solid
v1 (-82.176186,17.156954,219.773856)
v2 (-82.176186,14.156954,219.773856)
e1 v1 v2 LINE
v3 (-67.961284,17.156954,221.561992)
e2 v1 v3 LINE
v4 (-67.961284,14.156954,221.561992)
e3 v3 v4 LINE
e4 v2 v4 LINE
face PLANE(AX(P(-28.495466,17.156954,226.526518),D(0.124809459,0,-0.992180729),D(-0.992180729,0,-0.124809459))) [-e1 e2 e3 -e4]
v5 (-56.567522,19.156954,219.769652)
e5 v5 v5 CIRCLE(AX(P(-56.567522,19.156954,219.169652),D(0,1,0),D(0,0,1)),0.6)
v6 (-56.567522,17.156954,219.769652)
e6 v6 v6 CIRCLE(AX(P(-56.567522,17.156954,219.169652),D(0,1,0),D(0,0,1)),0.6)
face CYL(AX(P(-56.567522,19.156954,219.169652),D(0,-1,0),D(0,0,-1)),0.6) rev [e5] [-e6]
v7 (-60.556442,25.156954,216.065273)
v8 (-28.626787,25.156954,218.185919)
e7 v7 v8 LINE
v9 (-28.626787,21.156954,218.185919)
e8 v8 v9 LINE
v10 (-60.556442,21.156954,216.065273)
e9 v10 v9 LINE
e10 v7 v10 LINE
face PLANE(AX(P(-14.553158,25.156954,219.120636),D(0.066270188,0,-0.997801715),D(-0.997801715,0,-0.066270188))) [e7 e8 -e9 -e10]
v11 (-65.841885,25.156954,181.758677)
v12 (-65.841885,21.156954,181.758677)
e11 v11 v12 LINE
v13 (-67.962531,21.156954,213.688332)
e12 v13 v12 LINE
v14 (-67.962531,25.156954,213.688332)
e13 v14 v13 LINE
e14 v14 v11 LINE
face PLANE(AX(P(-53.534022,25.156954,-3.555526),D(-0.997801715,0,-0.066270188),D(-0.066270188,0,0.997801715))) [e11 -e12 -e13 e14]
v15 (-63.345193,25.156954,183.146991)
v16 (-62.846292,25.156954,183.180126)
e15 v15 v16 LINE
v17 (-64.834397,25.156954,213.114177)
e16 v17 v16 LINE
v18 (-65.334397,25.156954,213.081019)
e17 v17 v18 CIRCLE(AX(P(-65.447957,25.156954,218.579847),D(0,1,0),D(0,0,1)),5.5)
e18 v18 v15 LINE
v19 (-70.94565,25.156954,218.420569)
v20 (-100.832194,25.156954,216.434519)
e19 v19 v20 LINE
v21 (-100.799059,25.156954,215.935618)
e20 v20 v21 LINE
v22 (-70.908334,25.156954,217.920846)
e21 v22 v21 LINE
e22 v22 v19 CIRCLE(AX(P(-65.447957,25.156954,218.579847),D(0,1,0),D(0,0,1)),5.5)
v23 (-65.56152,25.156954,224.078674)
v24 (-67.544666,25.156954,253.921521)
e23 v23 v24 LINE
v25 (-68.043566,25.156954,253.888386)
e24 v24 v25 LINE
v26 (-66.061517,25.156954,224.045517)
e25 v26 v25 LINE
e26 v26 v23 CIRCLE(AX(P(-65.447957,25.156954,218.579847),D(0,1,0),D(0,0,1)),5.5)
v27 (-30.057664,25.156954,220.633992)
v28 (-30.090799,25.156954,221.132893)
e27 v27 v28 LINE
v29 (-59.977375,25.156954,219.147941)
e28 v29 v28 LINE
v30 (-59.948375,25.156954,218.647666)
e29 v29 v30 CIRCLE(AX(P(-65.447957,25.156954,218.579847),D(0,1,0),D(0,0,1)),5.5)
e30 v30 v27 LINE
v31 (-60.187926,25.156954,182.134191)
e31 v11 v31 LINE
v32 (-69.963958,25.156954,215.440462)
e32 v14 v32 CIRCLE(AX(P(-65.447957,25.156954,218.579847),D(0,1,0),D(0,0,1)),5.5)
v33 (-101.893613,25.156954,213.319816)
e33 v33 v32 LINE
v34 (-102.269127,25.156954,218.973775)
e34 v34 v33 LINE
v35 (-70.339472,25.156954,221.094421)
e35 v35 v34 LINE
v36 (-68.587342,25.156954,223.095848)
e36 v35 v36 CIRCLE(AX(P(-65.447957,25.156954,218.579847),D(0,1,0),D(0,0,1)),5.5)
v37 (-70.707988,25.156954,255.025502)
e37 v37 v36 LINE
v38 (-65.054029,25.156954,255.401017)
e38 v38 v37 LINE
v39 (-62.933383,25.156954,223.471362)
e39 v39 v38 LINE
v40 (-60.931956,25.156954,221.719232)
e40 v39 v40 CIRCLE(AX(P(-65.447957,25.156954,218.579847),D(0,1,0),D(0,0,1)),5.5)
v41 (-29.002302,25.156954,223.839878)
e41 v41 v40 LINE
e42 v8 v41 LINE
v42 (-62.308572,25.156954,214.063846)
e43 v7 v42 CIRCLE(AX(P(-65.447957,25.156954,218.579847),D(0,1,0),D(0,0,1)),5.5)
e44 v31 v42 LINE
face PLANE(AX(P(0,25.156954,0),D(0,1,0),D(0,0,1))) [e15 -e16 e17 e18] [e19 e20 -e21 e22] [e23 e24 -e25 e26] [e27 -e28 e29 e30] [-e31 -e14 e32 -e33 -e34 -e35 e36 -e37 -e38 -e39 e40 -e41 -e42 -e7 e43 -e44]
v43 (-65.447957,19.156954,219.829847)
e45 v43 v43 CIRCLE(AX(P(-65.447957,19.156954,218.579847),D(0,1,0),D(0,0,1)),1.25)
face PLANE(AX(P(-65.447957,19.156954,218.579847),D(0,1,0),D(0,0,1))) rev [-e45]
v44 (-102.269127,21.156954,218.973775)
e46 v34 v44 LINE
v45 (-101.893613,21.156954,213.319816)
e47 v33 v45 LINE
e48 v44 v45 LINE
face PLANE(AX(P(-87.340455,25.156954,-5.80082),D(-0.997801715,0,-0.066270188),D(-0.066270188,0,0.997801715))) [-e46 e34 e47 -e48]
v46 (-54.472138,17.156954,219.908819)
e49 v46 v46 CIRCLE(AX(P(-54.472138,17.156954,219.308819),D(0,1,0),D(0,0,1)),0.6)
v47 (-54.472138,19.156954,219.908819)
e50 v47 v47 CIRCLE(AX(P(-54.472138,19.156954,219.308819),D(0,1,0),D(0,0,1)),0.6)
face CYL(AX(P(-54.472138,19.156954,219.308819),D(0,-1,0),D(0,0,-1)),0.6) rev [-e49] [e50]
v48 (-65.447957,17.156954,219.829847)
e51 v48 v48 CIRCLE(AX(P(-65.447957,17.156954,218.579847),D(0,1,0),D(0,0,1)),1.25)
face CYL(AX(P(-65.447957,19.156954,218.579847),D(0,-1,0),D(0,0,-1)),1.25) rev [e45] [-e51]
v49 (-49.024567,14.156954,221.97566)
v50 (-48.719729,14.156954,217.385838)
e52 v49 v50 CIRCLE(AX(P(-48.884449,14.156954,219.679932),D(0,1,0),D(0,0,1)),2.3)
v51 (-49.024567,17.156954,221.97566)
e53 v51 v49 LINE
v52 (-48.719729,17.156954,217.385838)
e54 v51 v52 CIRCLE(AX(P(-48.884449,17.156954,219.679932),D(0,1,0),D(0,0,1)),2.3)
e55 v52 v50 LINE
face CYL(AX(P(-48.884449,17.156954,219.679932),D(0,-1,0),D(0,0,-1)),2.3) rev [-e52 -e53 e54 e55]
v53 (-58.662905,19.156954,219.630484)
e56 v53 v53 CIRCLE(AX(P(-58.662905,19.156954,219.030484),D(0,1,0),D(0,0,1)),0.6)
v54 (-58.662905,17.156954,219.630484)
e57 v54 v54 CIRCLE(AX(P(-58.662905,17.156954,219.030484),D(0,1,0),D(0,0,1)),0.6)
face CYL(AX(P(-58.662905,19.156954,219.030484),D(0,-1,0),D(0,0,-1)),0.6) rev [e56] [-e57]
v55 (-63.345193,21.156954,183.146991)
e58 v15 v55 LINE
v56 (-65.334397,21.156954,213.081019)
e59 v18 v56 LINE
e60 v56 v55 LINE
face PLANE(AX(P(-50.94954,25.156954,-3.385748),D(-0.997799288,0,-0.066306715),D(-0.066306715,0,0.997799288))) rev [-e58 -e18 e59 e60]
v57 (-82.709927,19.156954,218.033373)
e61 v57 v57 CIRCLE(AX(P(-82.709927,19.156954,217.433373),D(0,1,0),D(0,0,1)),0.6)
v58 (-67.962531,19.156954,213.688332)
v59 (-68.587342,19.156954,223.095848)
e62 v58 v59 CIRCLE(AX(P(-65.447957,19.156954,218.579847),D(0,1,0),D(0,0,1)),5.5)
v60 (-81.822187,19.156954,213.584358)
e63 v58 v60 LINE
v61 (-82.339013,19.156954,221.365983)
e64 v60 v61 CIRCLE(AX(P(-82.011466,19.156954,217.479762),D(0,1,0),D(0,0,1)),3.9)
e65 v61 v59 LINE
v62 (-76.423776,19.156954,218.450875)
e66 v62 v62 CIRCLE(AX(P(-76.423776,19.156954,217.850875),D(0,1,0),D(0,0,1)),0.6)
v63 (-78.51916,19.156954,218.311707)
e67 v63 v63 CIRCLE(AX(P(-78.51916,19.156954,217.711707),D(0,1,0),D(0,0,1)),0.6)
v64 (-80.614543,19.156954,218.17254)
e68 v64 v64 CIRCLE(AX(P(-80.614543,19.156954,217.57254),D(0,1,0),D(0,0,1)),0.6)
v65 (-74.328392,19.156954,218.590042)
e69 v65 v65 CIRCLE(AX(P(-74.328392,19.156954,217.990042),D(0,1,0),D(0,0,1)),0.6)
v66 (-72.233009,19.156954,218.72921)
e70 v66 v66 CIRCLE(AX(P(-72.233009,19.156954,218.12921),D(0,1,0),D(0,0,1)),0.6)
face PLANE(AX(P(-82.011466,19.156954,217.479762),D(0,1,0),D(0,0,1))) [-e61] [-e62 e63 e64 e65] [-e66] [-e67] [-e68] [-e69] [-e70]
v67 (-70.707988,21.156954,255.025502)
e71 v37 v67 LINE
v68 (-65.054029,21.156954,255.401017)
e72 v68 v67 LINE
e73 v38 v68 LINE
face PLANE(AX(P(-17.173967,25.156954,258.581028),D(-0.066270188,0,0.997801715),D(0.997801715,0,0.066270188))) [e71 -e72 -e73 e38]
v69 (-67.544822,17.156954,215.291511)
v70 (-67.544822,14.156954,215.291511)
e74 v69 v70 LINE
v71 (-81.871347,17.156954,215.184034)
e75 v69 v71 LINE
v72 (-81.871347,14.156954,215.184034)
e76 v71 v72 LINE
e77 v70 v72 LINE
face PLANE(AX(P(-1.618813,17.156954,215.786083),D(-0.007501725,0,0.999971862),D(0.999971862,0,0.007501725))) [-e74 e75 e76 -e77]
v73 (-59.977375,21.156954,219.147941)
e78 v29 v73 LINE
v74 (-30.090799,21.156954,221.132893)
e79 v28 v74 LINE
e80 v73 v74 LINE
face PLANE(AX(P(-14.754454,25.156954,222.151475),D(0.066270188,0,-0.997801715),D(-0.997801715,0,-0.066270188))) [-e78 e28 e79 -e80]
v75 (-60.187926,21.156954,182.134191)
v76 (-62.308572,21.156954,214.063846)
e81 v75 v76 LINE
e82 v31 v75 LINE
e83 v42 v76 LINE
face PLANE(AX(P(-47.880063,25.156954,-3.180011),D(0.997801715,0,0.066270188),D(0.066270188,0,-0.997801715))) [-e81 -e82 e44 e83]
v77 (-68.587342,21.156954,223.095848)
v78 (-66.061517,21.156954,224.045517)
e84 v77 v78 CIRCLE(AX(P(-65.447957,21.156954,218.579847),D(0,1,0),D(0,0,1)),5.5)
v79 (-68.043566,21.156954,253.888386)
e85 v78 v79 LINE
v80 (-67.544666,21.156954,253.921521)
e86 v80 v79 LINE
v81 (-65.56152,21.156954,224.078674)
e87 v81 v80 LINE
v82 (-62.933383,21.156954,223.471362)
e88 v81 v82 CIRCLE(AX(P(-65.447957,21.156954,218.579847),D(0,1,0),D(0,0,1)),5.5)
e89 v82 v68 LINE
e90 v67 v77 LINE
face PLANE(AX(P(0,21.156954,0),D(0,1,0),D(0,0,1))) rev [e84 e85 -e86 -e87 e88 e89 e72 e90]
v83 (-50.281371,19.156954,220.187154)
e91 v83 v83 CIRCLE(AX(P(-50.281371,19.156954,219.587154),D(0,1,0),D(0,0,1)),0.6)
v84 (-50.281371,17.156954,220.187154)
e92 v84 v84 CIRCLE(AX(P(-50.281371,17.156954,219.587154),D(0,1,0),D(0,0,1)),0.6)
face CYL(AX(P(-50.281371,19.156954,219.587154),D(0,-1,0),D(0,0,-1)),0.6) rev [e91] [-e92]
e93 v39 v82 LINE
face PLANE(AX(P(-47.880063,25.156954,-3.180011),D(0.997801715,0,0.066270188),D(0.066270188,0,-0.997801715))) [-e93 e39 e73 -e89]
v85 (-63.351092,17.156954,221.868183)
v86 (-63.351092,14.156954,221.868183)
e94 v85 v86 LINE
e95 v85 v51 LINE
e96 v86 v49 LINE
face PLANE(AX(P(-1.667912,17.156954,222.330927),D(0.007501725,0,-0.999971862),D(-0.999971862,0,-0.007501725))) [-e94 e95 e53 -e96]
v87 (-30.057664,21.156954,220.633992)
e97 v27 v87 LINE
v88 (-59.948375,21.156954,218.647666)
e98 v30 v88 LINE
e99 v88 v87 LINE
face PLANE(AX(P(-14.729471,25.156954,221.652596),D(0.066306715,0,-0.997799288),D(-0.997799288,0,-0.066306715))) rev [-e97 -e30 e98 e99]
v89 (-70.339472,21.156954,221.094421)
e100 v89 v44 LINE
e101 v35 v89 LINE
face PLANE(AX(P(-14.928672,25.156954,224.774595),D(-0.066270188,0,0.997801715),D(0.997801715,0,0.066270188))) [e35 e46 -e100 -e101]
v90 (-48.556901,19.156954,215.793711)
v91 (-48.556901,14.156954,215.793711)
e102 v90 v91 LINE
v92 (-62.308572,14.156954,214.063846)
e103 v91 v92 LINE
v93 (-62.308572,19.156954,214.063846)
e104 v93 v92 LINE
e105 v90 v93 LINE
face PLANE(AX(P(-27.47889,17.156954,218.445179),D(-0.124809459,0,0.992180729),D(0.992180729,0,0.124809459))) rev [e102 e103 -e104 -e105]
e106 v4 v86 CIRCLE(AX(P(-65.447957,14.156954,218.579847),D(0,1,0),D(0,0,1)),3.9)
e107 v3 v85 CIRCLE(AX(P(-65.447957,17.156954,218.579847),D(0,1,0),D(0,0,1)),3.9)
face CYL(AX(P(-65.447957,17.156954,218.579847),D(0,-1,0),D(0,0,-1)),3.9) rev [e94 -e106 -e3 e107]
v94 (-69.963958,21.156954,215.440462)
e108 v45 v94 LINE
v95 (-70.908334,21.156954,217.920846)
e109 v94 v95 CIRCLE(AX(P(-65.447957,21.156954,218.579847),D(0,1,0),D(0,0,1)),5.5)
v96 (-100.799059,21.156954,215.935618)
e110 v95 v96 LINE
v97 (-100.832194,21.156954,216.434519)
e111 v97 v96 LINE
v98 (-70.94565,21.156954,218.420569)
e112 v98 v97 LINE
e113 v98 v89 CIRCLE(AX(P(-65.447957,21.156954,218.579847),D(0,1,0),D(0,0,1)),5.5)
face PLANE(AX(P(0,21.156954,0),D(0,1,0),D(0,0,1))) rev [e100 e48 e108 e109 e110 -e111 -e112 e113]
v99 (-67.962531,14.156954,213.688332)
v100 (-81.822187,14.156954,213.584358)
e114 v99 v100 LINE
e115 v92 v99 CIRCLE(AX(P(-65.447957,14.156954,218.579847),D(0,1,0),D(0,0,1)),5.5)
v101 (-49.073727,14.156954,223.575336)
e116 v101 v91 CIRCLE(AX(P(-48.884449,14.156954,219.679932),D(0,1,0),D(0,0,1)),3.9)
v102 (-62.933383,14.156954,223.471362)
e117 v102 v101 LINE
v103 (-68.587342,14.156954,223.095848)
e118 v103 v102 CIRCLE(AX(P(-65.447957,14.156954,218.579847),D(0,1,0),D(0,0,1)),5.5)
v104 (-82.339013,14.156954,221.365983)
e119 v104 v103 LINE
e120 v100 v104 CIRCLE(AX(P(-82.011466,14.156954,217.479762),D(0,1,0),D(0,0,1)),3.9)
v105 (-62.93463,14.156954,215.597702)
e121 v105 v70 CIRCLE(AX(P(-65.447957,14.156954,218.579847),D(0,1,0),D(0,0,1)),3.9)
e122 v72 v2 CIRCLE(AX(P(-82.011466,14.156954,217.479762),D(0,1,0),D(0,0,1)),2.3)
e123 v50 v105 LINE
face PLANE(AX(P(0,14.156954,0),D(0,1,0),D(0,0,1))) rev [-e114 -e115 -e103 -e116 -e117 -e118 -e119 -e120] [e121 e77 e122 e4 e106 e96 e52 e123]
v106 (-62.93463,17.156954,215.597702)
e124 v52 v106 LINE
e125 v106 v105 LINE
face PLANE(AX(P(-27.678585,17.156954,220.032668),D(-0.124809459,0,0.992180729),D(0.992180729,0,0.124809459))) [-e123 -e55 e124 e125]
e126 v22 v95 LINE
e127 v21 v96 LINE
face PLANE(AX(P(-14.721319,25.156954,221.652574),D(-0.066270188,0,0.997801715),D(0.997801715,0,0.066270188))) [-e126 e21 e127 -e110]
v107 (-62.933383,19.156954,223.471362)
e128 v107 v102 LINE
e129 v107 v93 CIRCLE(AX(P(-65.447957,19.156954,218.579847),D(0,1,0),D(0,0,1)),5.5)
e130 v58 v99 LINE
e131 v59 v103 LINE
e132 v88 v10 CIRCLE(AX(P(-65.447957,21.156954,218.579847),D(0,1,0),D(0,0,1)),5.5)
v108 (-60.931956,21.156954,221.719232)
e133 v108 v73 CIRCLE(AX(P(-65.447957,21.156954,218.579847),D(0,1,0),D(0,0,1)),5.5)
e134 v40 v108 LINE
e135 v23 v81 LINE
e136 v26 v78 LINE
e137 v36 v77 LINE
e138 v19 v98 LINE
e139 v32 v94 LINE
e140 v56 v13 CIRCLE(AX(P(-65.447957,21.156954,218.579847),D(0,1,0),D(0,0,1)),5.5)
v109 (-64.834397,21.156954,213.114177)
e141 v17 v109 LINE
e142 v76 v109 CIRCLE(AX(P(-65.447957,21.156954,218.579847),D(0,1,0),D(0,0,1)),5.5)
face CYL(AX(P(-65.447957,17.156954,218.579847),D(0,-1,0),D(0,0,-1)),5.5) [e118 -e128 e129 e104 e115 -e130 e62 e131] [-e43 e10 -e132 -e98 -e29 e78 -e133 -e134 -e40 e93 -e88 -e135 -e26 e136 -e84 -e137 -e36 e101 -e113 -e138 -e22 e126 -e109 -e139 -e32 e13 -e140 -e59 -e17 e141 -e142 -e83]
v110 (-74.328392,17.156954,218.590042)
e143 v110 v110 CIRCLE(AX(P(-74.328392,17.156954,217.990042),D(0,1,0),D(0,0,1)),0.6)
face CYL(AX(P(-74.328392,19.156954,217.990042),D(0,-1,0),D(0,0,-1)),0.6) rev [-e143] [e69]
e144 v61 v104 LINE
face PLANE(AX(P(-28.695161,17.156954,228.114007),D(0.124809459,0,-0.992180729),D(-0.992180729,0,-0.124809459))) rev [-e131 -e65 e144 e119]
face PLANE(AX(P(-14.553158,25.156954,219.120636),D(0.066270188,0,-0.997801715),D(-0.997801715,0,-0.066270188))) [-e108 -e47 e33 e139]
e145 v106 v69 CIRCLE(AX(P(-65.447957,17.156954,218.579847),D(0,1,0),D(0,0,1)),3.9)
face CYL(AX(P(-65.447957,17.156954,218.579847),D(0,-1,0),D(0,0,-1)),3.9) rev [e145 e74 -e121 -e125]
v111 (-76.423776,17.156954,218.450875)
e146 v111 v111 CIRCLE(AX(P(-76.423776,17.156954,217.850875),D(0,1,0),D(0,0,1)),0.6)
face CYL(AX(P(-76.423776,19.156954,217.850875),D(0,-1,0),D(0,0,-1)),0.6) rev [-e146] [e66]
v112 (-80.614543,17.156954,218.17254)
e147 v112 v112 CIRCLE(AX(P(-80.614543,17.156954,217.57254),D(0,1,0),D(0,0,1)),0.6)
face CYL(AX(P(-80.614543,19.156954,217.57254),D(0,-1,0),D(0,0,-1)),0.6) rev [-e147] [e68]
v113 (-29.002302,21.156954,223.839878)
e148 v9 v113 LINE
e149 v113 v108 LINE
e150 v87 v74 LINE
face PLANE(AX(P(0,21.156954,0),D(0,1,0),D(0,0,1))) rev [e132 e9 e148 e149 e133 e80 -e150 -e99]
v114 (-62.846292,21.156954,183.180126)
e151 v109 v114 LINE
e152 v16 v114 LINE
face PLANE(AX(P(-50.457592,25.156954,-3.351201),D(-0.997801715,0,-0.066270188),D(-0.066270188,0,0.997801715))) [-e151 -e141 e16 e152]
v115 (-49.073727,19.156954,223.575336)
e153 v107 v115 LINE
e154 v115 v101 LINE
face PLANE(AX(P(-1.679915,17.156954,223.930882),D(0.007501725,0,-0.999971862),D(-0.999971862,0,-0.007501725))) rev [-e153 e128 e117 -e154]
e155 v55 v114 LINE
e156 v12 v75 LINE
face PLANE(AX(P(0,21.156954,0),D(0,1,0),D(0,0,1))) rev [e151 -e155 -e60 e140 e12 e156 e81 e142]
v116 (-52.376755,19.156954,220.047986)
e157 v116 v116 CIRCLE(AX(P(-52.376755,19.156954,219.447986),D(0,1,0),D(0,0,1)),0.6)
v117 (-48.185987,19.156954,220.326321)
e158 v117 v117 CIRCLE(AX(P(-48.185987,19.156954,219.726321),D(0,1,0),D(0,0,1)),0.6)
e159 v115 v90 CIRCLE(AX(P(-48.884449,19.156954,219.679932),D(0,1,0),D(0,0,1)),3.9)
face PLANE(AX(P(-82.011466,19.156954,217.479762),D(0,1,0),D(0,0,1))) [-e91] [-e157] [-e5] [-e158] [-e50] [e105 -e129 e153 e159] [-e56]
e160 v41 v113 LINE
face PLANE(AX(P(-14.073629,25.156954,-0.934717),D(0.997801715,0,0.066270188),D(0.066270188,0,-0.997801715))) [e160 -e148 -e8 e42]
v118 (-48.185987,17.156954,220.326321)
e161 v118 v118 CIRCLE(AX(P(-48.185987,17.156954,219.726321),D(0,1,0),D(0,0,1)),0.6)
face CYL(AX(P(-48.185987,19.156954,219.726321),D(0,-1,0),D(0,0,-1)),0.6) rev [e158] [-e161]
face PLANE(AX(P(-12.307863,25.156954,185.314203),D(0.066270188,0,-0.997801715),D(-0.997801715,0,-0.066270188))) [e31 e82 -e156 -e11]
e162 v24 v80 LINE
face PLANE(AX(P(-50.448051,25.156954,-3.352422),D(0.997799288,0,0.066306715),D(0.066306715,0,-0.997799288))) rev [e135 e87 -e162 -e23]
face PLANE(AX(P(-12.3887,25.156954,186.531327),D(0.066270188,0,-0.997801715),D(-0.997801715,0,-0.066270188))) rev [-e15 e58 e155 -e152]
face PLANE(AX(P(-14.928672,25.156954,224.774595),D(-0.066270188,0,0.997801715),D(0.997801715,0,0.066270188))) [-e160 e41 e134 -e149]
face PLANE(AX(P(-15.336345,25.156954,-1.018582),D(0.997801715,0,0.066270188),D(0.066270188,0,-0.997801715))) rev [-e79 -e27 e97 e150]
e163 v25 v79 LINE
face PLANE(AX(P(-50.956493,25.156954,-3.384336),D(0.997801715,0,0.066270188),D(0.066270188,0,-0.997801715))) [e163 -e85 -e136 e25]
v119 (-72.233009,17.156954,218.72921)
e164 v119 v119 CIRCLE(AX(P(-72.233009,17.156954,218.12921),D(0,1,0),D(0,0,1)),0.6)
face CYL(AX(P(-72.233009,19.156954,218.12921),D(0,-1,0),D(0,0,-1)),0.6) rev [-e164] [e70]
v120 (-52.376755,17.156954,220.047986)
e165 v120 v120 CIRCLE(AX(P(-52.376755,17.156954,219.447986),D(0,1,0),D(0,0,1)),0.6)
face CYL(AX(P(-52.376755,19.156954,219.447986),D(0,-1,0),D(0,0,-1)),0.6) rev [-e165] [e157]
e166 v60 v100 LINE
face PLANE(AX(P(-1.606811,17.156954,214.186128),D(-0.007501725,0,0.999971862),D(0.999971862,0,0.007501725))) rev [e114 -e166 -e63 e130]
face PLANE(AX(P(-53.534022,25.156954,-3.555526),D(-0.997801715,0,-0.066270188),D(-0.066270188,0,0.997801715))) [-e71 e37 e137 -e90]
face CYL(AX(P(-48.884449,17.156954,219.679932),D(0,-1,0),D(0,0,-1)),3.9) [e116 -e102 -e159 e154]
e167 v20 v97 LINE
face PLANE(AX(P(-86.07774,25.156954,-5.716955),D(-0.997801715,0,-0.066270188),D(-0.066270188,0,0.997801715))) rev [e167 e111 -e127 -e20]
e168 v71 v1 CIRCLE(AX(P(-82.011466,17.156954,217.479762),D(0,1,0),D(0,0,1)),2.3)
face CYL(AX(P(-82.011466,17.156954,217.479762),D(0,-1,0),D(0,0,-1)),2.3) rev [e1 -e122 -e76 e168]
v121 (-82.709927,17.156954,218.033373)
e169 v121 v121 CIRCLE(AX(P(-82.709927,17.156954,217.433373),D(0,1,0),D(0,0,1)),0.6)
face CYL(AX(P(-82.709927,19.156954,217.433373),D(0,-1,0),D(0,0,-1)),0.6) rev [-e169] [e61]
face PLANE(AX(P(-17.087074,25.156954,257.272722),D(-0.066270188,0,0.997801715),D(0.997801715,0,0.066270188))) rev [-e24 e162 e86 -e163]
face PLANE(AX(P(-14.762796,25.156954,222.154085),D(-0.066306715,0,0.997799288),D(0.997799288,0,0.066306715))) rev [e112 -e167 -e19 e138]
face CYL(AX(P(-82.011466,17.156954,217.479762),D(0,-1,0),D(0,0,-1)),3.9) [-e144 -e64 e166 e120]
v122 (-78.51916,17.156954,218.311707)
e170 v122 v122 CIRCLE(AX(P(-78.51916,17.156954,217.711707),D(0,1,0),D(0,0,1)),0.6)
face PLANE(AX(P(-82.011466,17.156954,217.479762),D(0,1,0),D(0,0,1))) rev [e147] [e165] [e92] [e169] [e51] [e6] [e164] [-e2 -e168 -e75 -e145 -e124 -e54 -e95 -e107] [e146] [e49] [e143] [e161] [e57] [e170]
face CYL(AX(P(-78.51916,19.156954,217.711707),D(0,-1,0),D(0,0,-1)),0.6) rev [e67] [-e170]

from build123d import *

# Parameters (mm, degrees)
EXTRUDE_1_DEPTH = 3
SKETCH_2_R      = 0.6
SKETCH_2_R_2    = 1.25
EXTRUDE_2_DEPTH = 2
SKETCH_3_R      = 5.5
EXTRUDE_3_DEPTH = 2
SKETCH_4_R      = 5.5
EXTRUDE_5_DEPTH = 4


# Read off the part's stored shape, not the designer's step: 填料-伸長1
with BuildPart() as part:
    # 填料-伸長1 outline → 填料-伸長1 (new body)
    with BuildSketch(Plane(origin=(0, 14.156954032, 0), x_dir=(1, 0, 0), z_dir=(0, 1, 0))):
        with BuildLine():
            Line((-82.339013046, -221.365982672), (-68.587342058, -223.095847576))
            ThreePointArc((-68.587342058, -223.095847576), (-65.812443105, -224.067756352), (-62.933383432, -223.471361963))
            Line((-62.933383432, -223.471361963), (-49.073726982, -223.575336213))
            ThreePointArc((-49.073726982, -223.575336213), (-44.993021918, -219.938385769), (-48.556901099, -215.793711169))
            Line((-48.556901099, -215.793711169), (-62.308572088, -214.063846266))
            ThreePointArc((-62.308572088, -214.063846266), (-65.08347104, -213.091937489), (-67.962530713, -213.688331878))
            Line((-67.962530713, -213.688331878), (-81.822187163, -213.584357628))
            ThreePointArc((-81.822187163, -213.584357628), (-85.902892228, -217.221308072), (-82.339013046, -221.365982672))
        make_face()
        with BuildLine():
            Line((-49.024567087, -221.975659985), (-63.351091856, -221.868183318))
            ThreePointArc((-63.351091856, -221.868183318), (-65.706410804, -222.471273609), (-67.96128377, -221.561991939))
            Line((-67.96128377, -221.561991939), (-82.176185543, -219.773855813))
            ThreePointArc((-82.176185543, -219.773855813), (-84.306409484, -217.327340372), (-81.871347058, -215.184033856))
            Line((-81.871347058, -215.184033856), (-67.544822289, -215.291510523))
            ThreePointArc((-67.544822289, -215.291510523), (-65.189503341, -214.688420233), (-62.934630375, -215.597701902))
            Line((-62.934630375, -215.597701902), (-48.719728602, -217.385838028))
            ThreePointArc((-48.719728602, -217.385838028), (-46.589504661, -219.832353469), (-49.024567087, -221.975659985))
        make_face(mode=Mode.SUBTRACT)
    extrude(amount=EXTRUDE_1_DEPTH)

    # 草圖2 → 填料-伸長2 (add)
    with BuildSketch(Plane(origin=(0, 17.156954032, 0), x_dir=(1, 0, 0), z_dir=(0, 1, 0))):
        with BuildLine():
            Line((-82.339013046, -221.365982672), (-68.587342058, -223.095847576))
            ThreePointArc((-68.587342058, -223.095847576), (-65.812443105, -224.067756352), (-62.933383432, -223.471361963))
            Line((-62.933383432, -223.471361963), (-49.073726982, -223.575336213))
            ThreePointArc((-49.073726982, -223.575336213), (-44.993021918, -219.938385769), (-48.556901099, -215.793711169))
            Line((-48.556901099, -215.793711169), (-62.308572088, -214.063846266))
            ThreePointArc((-62.308572088, -214.063846266), (-65.08347104, -213.091937489), (-67.962530713, -213.688331878))
            Line((-67.962530713, -213.688331878), (-81.822187163, -213.584357628))
            ThreePointArc((-81.822187163, -213.584357628), (-85.902892228, -217.221308072), (-82.339013046, -221.365982672))
        make_face()
        with Locations(Location((-48.185987405, -219.726321168, 0), (0, 0, 270))):
            Circle(SKETCH_2_R, mode=Mode.SUBTRACT)
        with Locations(Location((-50.281371006, -219.587153774, 0), (0, 0, 270))):
            Circle(SKETCH_2_R, mode=Mode.SUBTRACT)
        with Locations(Location((-52.376754608, -219.44798638, 0), (0, 0, 270))):
            Circle(SKETCH_2_R, mode=Mode.SUBTRACT)
        with Locations(Location((-54.472138209, -219.308818985, 0), (0, 0, 270))):
            Circle(SKETCH_2_R, mode=Mode.SUBTRACT)
        with Locations(Location((-56.56752181, -219.169651591, 0), (0, 0, 270))):
            Circle(SKETCH_2_R, mode=Mode.SUBTRACT)
        with Locations(Location((-58.662905411, -219.030484197, 0), (0, 0, 270))):
            Circle(SKETCH_2_R, mode=Mode.SUBTRACT)
        with Locations(Location((-65.447957073, -218.579846921, 0), (0, 0, 270))):
            Circle(SKETCH_2_R_2, mode=Mode.SUBTRACT)
        with Locations(Location((-72.233008734, -218.129209644, 0), (0, 0, 270))):
            Circle(SKETCH_2_R, mode=Mode.SUBTRACT)
        with Locations(Location((-74.328392335, -217.99004225, 0), (0, 0, 270))):
            Circle(SKETCH_2_R, mode=Mode.SUBTRACT)
        with Locations(Location((-76.423775936, -217.850874856, 0), (0, 0, 270))):
            Circle(SKETCH_2_R, mode=Mode.SUBTRACT)
        with Locations(Location((-78.519159538, -217.711707461, 0), (0, 0, 270))):
            Circle(SKETCH_2_R, mode=Mode.SUBTRACT)
        with Locations(Location((-80.614543139, -217.572540067, 0), (0, 0, 270))):
            Circle(SKETCH_2_R, mode=Mode.SUBTRACT)
        with Locations(Location((-82.70992674, -217.433372673, 0), (0, 0, 270))):
            Circle(SKETCH_2_R, mode=Mode.SUBTRACT)
    extrude(amount=EXTRUDE_2_DEPTH)

    # 草圖3 → 填料-伸長3 (add)
    with BuildSketch(Plane(origin=(0, 19.156954032, 0), x_dir=(1, 0, 0), z_dir=(0, 1, 0))):
        with Locations(Location((-65.447957073, -218.579846921, 0), (0, 0, 117.206266925))):
            Circle(SKETCH_3_R)
    extrude(amount=EXTRUDE_3_DEPTH)

    # 草圖4 → 填料-伸長5 (add)
    with BuildSketch(Plane(origin=(0, 21.156954032, 0), x_dir=(1, 0, 0), z_dir=(0, 1, 0))):
        with BuildLine():
            Line((-65.841884706, -181.758677002), (-67.962530713, -213.688331878))
            ThreePointArc((-67.962530713, -213.688331878), (-66.686272082, -213.221061989), (-65.334397341, -213.081019392))
            Line((-65.334397341, -213.081019392), (-63.345192567, -183.146990755))
            Line((-63.345192567, -183.146990755), (-62.84629171, -183.180125849))
            Line((-62.84629171, -183.180125849), (-64.834397341, -213.114177295))
            ThreePointArc((-64.834397341, -213.114177295), (-63.512339264, -213.431703207), (-62.308572088, -214.063846266))
            Line((-62.308572088, -214.063846266), (-60.187926081, -182.134191389))
            Line((-60.187926081, -182.134191389), (-65.841884706, -181.758677002))
        make_face()
        with BuildLine():
            Line((-28.626787154, -218.185919287), (-60.55644203, -216.06527328))
            ThreePointArc((-60.55644203, -216.06527328), (-60.102242306, -217.286272944), (-59.947957073, -218.579846921))
            ThreePointArc((-59.947957073, -218.579846921), (-59.94806161, -218.613757162), (-59.94837522, -218.647666115))
            Line((-59.94837522, -218.647666115), (-30.05766404, -220.633992316))
            Line((-30.05766404, -220.633992316), (-30.090799133, -221.132893173))
            Line((-30.090799133, -221.132893173), (-59.977374886, -219.147940697))
            ThreePointArc((-59.977374886, -219.147940697), (-60.291810853, -220.494045491), (-60.931956418, -221.719231906))
            Line((-60.931956418, -221.719231906), (-29.002301541, -223.839877913))
            Line((-29.002301541, -223.839877913), (-28.626787154, -218.185919287))
        make_face()
        with Locations(Location((-65.447957073, -218.579846921, 0), (0, 0, 117.206266925))):
            Circle(SKETCH_4_R)
        with BuildLine():
            ThreePointArc((-66.061516804, -224.045516546), (-67.383574881, -223.727990635), (-68.587342058, -223.095847576))
            Line((-68.587342058, -223.095847576), (-70.707988065, -255.025502452))
            Line((-70.707988065, -255.025502452), (-65.054029439, -255.401016839))
            Line((-65.054029439, -255.401016839), (-62.933383432, -223.471361963))
            ThreePointArc((-62.933383432, -223.471361963), (-64.209643695, -223.938632229), (-65.561520152, -224.07867438))
            Line((-65.561520152, -224.07867438), (-67.544665601, -253.921520844))
            Line((-67.544665601, -253.921520844), (-68.043566458, -253.88838575))
            Line((-68.043566458, -253.88838575), (-66.061516804, -224.045516546))
        make_face()
        with BuildLine():
            ThreePointArc((-70.908334203, -217.920846468), (-70.588006225, -216.622835241), (-69.963957728, -215.440461936))
            Line((-69.963957728, -215.440461936), (-101.893612604, -213.319815929))
            Line((-101.893612604, -213.319815929), (-102.269126991, -218.973774554))
            Line((-102.269126991, -218.973774554), (-70.339472115, -221.094420561))
            ThreePointArc((-70.339472115, -221.094420561), (-70.811844008, -219.795871979), (-70.945650262, -218.420568553))
            Line((-70.945650262, -218.420568553), (-100.832194129, -216.434519282))
            Line((-100.832194129, -216.434519282), (-100.799059035, -215.935618425))
            Line((-100.799059035, -215.935618425), (-70.908334203, -217.920846468))
        make_face()
    extrude(amount=EXTRUDE_5_DEPTH)


solid = part.part
